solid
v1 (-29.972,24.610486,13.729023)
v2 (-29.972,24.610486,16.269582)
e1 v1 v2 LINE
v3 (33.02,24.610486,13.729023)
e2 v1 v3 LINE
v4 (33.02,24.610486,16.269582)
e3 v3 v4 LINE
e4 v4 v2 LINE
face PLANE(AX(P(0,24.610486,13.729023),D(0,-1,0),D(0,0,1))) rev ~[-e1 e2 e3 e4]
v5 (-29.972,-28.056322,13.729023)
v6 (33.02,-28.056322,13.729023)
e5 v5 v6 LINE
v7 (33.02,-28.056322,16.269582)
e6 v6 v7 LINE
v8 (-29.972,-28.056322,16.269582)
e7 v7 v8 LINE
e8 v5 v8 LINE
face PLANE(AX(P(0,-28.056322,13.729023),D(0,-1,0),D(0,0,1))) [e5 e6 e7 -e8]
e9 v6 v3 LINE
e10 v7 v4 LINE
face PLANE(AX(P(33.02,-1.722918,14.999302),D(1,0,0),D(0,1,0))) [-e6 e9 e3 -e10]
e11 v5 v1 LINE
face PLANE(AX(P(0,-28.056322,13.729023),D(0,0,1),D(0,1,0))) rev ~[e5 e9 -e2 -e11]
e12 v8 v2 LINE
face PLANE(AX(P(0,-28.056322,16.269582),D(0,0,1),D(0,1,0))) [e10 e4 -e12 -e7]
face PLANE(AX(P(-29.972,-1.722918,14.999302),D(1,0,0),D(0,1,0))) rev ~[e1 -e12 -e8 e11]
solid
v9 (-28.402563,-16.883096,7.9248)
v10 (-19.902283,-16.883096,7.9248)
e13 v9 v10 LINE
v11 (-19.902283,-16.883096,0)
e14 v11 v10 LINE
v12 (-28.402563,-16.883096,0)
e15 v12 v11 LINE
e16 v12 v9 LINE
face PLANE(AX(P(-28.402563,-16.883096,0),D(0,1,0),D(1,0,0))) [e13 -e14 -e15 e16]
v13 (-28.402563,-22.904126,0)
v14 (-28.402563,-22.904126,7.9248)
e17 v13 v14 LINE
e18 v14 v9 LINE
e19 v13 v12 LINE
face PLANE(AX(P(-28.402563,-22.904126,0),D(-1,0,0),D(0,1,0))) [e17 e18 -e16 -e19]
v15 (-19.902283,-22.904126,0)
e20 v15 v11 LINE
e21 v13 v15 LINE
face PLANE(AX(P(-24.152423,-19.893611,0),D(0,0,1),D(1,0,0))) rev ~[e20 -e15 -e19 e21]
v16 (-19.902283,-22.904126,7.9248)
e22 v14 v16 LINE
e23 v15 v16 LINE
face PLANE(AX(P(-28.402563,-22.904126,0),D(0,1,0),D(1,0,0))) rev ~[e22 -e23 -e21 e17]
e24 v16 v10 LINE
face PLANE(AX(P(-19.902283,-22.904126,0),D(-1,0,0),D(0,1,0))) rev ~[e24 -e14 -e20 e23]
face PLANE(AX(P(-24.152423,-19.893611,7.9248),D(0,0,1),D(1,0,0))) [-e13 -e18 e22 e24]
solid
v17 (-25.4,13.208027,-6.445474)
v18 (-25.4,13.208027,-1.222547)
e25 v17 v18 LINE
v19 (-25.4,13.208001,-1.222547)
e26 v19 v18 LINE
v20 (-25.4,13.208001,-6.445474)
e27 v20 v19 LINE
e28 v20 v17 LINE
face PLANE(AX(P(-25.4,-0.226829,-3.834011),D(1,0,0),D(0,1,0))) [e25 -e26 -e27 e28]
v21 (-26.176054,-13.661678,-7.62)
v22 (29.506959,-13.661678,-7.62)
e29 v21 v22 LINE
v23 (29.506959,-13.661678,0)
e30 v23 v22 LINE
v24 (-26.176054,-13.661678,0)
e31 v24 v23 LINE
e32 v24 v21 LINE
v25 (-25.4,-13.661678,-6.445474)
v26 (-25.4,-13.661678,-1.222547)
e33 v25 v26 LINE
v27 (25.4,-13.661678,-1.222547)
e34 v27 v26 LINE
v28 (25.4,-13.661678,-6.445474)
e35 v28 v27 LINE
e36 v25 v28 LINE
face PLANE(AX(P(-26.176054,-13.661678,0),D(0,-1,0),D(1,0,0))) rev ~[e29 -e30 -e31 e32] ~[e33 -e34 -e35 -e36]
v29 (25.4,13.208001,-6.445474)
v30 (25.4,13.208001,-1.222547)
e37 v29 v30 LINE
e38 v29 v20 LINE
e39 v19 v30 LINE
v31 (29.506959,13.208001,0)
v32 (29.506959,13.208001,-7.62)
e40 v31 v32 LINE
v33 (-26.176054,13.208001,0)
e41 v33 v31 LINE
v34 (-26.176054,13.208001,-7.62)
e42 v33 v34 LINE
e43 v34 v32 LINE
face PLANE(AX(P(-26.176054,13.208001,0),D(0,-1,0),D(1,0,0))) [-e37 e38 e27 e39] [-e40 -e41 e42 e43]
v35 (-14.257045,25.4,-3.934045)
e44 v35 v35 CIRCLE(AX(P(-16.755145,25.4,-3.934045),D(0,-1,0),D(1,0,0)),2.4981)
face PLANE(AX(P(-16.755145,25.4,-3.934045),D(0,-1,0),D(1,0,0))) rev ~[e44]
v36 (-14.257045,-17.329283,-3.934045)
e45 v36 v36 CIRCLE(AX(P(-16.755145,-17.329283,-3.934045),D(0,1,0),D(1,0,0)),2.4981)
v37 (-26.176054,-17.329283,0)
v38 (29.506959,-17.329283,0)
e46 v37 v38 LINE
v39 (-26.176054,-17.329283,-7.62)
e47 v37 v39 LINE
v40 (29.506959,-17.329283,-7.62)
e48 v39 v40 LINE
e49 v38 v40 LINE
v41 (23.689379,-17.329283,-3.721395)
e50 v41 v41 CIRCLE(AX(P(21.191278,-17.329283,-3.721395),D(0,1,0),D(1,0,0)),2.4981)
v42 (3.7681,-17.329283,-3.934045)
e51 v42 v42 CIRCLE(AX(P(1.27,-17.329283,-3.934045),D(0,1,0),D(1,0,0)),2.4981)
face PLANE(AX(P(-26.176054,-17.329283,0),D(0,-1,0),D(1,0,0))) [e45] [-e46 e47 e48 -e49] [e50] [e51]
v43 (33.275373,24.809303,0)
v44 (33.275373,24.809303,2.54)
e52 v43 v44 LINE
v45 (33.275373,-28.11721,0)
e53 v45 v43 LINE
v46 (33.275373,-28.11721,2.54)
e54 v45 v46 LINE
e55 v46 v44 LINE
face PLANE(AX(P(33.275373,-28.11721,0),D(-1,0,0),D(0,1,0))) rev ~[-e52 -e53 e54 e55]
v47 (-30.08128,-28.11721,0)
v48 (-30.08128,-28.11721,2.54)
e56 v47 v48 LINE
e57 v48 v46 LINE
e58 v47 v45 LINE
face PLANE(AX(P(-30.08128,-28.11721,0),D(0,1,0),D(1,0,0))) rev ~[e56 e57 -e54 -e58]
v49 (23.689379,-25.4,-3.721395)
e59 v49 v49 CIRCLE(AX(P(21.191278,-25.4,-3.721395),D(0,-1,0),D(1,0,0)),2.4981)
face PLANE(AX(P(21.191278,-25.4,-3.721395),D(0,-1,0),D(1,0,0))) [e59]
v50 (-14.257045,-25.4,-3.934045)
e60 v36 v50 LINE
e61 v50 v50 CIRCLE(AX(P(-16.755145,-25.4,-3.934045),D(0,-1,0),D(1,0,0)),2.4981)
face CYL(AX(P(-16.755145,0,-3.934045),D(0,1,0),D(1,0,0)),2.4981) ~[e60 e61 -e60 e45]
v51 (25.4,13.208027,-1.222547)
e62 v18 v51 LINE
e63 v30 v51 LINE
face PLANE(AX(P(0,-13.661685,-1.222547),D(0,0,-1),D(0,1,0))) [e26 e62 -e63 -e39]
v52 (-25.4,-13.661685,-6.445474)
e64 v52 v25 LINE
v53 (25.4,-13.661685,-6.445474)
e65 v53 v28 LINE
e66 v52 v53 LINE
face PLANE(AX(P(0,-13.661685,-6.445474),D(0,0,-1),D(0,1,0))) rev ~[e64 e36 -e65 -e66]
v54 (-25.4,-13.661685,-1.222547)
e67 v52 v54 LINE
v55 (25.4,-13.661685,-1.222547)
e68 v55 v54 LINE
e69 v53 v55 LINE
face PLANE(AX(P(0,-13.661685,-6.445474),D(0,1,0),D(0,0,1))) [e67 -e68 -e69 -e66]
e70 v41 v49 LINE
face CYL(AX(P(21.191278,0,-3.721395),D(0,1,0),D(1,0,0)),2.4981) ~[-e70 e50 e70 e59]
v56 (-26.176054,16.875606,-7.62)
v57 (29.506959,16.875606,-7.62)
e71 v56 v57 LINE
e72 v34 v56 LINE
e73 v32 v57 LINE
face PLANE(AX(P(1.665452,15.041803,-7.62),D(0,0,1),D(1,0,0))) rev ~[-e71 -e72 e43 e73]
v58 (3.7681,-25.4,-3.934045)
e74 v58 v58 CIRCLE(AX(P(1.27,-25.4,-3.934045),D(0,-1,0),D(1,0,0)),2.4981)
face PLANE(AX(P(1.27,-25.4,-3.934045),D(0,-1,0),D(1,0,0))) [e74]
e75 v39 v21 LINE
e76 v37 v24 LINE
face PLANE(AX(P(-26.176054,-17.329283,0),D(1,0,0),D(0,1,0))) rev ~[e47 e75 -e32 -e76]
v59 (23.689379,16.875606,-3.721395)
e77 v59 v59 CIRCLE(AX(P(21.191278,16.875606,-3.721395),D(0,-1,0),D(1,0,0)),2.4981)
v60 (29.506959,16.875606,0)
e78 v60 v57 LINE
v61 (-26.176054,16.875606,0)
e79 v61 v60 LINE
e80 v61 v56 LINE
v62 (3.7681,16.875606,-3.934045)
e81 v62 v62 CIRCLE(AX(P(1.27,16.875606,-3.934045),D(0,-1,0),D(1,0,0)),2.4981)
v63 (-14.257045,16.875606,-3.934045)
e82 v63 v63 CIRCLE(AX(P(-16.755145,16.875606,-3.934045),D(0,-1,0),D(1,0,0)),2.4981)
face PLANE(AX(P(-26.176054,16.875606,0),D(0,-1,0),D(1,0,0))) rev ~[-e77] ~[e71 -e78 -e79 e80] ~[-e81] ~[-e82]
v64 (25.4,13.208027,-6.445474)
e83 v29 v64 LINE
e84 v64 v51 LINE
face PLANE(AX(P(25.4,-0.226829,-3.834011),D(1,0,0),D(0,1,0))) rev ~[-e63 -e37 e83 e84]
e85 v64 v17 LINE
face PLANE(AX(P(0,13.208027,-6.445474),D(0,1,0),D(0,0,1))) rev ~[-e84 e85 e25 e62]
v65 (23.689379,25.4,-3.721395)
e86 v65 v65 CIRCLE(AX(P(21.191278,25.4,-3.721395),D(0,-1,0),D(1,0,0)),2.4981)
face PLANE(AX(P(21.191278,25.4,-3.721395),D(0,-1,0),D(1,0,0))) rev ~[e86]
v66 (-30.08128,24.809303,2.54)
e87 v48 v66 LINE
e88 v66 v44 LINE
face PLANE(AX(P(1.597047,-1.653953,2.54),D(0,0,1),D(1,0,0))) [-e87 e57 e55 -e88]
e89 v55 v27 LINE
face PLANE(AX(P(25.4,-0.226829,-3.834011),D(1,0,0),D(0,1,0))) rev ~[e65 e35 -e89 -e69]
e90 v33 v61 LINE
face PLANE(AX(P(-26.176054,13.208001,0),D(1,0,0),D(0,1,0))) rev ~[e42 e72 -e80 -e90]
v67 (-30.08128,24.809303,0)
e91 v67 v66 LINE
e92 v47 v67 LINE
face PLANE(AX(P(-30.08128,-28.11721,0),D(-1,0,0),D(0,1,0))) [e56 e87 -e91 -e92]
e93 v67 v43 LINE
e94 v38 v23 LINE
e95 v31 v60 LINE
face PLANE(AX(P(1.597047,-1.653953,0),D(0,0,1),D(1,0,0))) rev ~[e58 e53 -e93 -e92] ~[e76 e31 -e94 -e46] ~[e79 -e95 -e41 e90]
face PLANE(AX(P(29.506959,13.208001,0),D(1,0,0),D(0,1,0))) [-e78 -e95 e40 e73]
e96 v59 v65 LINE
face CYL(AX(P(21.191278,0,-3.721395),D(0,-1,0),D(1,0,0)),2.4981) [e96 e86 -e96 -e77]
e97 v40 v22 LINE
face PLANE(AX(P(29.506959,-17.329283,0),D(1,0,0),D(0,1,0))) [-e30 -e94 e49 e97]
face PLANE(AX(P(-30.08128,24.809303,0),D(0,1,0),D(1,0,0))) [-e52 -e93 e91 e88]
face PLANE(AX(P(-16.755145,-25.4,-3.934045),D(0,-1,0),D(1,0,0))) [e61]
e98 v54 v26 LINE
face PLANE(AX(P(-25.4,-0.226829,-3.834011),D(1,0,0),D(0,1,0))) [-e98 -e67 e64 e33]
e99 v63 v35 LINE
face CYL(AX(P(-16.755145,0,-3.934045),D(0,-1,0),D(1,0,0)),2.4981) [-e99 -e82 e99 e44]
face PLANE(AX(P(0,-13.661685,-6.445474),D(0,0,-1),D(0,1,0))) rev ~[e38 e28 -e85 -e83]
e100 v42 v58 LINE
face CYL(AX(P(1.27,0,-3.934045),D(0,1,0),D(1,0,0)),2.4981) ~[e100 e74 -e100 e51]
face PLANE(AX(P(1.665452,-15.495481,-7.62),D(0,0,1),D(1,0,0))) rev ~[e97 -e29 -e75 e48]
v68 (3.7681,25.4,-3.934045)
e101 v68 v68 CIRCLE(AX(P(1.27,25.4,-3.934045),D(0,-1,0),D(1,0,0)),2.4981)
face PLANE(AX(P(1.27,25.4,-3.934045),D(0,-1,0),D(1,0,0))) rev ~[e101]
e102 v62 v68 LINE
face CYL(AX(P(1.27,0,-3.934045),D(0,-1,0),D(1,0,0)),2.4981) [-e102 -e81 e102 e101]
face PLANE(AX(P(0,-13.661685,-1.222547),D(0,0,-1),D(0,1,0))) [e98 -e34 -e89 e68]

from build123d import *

# Parameters (mm, degrees)
F0_W          = 63.3566528559
F0_H          = 52.9265124351
F1_DEPTH      = 2.54
F2_W          = 52.6668075472
F2_H          = 2.5405590422
F3_DEPTH      = 29.972
F3_DEPTH_BACK = 33.02
F4_W          = 55.6830130517
F4_H          = 3.6676051095
F5_DEPTH      = 7.62
F6_R          = 2.498100457
F7_DEPTH      = 25.4
F7_DEPTH_BACK = 25.4
F8_W          = 26.8697123975
F8_H          = 5.2229278954
F9_DEPTH      = 25.4
F9_DEPTH_BACK = 25.4
F10_W         = 8.5002798587
F10_H         = 6.0210302472
F11_DEPTH     = 7.9248


# Not quite as in the source:
# - the program builds the solid bodies; features that only make, move or delete a surface that nothing else refers to are left out


with BuildPart() as f1:
    # F0 (on Top) → F1 (new body)
    with BuildSketch(Plane.XY):
        with Locations((1.5970468521, -1.6539534554)):
            Rectangle(F0_W, F0_H)
    extrude(amount=F1_DEPTH)

    # F4 (on Top) → F5 (join)
    with BuildSketch(Plane.XY):
        with Locations((1.6654524952, -15.4954805039)):
            Rectangle(F4_W, F4_H)
        with Locations((1.6654524952, 15.0418034755)):
            Rectangle(F4_W, F4_H)
    extrude(amount=-F5_DEPTH)

    # F6 (on Front) → F7 (join, two sides)
    with BuildSketch(Plane.XZ) as f7_sk:
        with Locations((21.1912784725, -3.7213952746)):
            Circle(F6_R)
        with Locations((-16.7551450431, -3.9340448566)):
            Circle(F6_R)
        with Locations((1.2700000079, -3.9340448566)):
            Circle(F6_R)
    extrude(amount=F7_DEPTH)
    extrude(f7_sk.sketch, amount=-F7_DEPTH_BACK)

    # F8 (on Right) → F9 (cut, two sides)
    with BuildSketch(Plane.YZ) as f9_sk:
        with Locations((-0.226829201, -3.8340105093)):
            Rectangle(F8_W, F8_H)
    extrude(amount=-F9_DEPTH, mode=Mode.SUBTRACT)
    extrude(f9_sk.sketch, amount=F9_DEPTH_BACK, mode=Mode.SUBTRACT)


with BuildPart() as f3:
    # F2 (on Right) → F3 (new body, two sides)
    with BuildSketch(Plane.YZ) as f3_sk:
        with Locations((-1.722917892, 14.9993023369)):
            Rectangle(F2_W, F2_H)
    extrude(amount=-F3_DEPTH)
    extrude(f3_sk.sketch, amount=F3_DEPTH_BACK)


with BuildPart() as f11:
    # F10 (on Top) → F11 (new body)
    with BuildSketch(Plane.XY):
        with Locations((-24.1524232551, -19.89361085)):
            Rectangle(F10_W, F10_H)
    extrude(amount=F11_DEPTH)


solid = Compound([f1.part, f3.part, f11.part])
